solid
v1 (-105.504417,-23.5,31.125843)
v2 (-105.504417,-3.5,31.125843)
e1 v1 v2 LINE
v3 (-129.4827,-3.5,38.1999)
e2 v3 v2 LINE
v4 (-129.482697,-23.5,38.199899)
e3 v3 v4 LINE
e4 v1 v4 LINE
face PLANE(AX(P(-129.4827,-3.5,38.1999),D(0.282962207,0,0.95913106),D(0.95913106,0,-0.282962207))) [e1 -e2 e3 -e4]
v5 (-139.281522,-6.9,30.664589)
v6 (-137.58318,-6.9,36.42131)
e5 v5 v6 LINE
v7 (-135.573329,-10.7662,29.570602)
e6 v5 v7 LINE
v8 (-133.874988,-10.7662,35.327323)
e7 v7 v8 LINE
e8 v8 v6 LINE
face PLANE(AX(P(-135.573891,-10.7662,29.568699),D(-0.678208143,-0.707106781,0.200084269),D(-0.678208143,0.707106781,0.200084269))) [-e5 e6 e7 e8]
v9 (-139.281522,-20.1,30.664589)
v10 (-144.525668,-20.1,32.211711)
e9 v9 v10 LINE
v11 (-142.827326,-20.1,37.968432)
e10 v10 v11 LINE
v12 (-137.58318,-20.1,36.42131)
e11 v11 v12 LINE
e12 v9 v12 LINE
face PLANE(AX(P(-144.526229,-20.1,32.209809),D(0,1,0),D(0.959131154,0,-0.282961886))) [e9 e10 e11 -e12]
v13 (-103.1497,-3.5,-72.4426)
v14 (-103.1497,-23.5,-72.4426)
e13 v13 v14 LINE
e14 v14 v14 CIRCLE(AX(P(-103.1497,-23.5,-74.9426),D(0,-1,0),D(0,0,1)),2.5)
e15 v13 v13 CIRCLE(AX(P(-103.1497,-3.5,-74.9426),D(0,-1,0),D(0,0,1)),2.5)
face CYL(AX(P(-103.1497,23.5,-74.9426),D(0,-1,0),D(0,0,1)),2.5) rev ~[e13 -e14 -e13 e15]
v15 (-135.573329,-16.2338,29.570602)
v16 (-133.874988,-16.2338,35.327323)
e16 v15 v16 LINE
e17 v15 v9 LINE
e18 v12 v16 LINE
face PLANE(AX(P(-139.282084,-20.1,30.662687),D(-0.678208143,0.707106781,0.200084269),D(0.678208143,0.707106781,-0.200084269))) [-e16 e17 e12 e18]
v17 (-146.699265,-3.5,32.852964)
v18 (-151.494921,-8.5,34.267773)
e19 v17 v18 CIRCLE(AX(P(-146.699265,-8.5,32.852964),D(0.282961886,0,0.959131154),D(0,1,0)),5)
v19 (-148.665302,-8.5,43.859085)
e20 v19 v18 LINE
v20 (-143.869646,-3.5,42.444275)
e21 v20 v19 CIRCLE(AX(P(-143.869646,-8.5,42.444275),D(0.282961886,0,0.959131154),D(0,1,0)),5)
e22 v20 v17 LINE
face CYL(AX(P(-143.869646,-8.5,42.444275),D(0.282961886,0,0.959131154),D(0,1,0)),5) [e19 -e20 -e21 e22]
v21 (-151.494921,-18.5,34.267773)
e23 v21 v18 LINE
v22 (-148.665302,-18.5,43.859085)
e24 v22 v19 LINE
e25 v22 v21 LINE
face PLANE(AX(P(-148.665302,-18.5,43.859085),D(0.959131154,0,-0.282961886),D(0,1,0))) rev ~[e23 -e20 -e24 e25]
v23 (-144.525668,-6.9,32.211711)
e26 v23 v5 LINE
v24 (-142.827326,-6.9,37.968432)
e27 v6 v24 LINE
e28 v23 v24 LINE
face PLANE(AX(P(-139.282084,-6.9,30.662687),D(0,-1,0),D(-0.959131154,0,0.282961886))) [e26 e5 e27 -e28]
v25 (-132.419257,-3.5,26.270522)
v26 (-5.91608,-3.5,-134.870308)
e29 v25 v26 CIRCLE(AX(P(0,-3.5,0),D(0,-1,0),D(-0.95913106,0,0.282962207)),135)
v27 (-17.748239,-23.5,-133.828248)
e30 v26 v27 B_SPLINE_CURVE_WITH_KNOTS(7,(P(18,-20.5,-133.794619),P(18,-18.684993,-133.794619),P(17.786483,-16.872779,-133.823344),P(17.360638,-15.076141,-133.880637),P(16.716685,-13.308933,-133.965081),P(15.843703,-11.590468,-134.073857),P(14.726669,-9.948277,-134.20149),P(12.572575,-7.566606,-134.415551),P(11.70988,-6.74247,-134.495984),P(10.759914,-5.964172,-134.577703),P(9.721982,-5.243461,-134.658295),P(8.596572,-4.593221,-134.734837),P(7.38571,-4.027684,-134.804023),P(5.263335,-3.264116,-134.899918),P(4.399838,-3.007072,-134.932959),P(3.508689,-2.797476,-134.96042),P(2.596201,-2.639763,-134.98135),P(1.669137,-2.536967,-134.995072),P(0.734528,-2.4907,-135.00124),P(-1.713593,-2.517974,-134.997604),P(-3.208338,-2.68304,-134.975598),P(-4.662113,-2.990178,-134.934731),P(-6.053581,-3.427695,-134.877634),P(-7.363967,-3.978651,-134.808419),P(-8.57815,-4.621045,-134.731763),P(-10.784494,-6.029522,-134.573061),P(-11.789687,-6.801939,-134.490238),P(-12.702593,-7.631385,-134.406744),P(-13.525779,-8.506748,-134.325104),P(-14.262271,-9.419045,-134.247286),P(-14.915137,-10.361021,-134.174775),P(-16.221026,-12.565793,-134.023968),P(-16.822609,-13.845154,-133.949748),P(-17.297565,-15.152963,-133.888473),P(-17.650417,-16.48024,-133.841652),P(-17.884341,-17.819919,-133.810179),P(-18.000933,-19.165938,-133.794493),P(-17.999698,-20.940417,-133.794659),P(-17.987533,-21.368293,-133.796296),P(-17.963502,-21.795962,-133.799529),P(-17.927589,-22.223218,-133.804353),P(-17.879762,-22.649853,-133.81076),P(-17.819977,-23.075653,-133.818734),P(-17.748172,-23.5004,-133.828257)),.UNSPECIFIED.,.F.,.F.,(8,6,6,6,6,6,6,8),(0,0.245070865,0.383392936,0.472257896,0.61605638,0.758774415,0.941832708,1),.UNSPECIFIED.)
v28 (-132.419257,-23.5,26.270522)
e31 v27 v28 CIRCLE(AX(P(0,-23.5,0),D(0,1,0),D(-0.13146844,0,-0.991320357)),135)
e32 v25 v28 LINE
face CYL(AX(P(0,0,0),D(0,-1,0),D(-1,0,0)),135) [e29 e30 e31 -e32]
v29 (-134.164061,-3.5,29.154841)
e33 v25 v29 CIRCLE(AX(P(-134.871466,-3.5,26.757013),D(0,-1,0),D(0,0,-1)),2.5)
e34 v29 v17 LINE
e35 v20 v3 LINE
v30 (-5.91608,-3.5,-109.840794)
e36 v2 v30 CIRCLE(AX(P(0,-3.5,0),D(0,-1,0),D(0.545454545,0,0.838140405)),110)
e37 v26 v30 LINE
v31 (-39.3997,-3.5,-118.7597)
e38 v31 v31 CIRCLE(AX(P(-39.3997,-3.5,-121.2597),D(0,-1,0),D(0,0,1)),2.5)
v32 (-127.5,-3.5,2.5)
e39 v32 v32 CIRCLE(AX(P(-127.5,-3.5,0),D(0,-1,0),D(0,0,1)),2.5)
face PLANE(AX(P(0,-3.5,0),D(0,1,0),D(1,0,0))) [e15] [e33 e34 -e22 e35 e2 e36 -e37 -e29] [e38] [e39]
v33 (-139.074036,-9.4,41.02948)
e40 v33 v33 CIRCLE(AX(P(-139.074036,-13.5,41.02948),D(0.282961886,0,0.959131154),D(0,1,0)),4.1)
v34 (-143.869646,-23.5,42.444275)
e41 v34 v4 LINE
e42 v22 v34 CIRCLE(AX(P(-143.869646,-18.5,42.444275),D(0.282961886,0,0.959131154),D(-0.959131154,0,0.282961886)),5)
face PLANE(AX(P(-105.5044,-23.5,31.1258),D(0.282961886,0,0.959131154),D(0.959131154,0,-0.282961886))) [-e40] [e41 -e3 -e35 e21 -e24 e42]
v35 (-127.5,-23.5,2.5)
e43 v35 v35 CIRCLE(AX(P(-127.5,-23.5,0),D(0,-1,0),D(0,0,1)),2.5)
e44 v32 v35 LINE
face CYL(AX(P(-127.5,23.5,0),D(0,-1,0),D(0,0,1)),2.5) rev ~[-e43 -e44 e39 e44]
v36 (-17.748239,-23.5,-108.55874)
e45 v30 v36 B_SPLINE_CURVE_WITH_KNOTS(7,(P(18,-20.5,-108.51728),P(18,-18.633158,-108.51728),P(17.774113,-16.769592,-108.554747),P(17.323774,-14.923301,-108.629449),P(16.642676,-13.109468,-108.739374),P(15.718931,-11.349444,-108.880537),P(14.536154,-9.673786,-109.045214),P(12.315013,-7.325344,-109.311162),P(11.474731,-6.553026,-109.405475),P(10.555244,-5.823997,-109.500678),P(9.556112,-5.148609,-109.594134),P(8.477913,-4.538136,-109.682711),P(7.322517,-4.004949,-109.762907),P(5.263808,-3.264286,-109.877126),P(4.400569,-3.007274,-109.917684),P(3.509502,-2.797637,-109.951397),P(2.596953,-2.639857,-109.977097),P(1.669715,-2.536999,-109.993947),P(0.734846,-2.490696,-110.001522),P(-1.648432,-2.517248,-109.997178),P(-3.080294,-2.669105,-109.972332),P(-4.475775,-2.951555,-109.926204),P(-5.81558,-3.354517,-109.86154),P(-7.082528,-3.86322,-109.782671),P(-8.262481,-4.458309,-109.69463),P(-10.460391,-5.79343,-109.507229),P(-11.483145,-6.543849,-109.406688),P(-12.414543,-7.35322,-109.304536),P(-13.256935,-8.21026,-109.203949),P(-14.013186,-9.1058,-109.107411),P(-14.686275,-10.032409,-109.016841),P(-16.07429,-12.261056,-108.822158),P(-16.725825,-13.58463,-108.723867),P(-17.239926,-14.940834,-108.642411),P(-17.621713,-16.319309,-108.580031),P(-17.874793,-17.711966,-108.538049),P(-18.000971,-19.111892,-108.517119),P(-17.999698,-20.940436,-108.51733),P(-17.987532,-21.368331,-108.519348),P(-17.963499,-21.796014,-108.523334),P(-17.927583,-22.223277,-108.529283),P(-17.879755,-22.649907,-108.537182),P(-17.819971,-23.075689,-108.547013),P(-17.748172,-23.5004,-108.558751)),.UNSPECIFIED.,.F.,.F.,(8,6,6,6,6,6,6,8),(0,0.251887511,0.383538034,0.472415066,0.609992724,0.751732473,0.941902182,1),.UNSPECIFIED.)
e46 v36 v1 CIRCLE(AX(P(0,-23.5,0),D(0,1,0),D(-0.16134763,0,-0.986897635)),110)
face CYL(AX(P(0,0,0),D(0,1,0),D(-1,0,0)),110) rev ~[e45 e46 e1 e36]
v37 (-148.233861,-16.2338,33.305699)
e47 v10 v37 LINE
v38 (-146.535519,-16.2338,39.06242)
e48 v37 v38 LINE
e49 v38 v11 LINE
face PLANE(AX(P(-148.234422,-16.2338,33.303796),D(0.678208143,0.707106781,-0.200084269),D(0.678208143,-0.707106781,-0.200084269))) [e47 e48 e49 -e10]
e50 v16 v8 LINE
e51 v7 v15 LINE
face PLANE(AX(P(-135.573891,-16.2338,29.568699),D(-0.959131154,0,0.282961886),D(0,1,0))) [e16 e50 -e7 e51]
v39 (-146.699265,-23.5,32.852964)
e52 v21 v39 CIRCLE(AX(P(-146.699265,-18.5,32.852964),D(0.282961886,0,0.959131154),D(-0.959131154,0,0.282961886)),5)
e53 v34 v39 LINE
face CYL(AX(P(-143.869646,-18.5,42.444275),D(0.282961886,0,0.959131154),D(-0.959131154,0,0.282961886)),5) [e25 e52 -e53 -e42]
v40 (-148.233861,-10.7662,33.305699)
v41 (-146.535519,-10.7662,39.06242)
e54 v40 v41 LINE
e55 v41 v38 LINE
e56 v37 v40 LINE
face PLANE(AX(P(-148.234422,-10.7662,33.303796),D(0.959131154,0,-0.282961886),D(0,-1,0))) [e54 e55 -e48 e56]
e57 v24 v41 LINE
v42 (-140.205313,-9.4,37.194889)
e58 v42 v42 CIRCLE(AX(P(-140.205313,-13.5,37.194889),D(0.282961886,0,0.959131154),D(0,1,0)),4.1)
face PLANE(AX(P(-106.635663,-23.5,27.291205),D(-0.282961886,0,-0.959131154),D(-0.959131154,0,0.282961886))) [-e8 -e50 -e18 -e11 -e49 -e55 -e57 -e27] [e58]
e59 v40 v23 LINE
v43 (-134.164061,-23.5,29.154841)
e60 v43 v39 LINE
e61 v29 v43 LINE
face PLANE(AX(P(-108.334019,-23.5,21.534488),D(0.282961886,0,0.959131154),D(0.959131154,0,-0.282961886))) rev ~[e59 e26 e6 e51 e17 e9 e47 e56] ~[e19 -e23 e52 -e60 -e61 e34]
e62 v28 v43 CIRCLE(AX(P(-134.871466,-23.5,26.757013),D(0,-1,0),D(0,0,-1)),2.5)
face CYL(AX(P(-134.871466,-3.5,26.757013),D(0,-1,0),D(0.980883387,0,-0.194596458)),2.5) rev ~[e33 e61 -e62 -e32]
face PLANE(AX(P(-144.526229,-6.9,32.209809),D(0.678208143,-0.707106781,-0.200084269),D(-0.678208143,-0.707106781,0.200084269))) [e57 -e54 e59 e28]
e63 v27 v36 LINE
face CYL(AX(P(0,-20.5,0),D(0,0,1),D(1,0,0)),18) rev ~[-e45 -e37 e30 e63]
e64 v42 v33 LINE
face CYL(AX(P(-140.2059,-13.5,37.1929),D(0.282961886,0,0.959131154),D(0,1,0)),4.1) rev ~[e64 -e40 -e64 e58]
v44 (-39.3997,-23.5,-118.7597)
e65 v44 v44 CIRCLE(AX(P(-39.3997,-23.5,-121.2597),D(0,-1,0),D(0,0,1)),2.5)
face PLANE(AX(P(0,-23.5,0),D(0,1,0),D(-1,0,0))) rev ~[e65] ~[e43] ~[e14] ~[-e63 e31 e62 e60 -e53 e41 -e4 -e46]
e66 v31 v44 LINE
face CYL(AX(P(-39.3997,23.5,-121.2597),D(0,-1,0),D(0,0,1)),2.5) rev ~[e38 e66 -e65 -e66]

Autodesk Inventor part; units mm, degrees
ref_plane "YZ Plane" through (0, 0, 0) normal (1, 0, 0) x (0, 1, 0)
ref_plane "XZ Plane" through (0, 0, 0) normal (0, 1, 0) x (-1, 0, 0)
ref_plane "XY Plane" through (0, 0, 0) normal (0, 0, 1) x (1, 0, 0)
sketch "Sketch1" plane through (0, 0, 0) normal (0, 1, 0) x (-1, 0, 0)
  circle A0 centre (0, 0) radius 135
  circle A1 centre (0, 0) radius 110
  dimension "d0" = 270
  dimension "d1" = 220
extrude "Extrusion1" add sketch "Sketch1" along normal mid plane 47
sketch "Sketch2" plane through (0, 0, 0) normal (0, 0, 1) x (1, 0, 0)
  circle A0 centre (0, -20.5) radius 18
  line L0 (-135, -23.5) -> (135, -23.5) projected
  dimension "d4" = 36
  dimension "d38" = 3
extrude "Extrusion2" cut sketch "Sketch2" against normal through all
sketch "Sketch3" plane through (0, 23.5, 0) normal (0, 1, 0) x (1, 0, 0)
  circle A0 centre (0, 0) radius 127.5
  circle A1 centre (-127.5, 0) radius 2
  circle A2 centre (-103.1497, -74.9426) radius 2
  circle A3 centre (-39.3997, -121.2597) radius 2
  circle A4 centre (39.3997, -121.2597) radius 2
  circle A5 centre (103.1497, -74.9426) radius 2
  circle A6 centre (127.5, 0) radius 2
  circle A7 centre (103.1497, 74.9426) radius 2
  circle A8 centre (39.3997, 121.2597) radius 2
  circle A9 centre (-39.3997, 121.2597) radius 2
  circle A10 centre (-103.1497, 74.9426) radius 2
  dimension "d7" = 255
  dimension "d8" = 4
  dimension "d11" = 360
hole "Hole1" at (39.3997, 23.5, 121.2597) at (-39.3997, 23.5, 121.2597) at (-103.1497, 23.5, 74.9426) at (-127.5, 23.5, 0) at (-103.1497, 23.5, -74.9426) at (-39.3997, 23.5, -121.2597) at (39.3997, 23.5, -121.2597) at (103.1497, 23.5, -74.9426) at (127.5, 23.5, 0) at (103.1497, 23.5, 74.9426) direction (0, -1, 0) diameter 5 end through all
sketch "Sketch4" plane through (0, 23.5, 0) normal (0, 1, 0) x (1, 0, 0)
  circle A0 centre (0, 0) radius 140
extrude "Extrusion3" cut sketch "Sketch4" against normal blind 27
sketch "Sketch7" plane through (0, -3.5, 0) normal (0, 1, 0) x (1, 0, 0)
  line L0 (0, 0) -> (70, 0)
  line L1 (80, -100) -> (60, -100)
  line L2 (60, -100) -> (60, 100)
  line L3 (60, 100) -> (80, 100)
  line L4 (80, 100) -> (80, -100)
  line L5 (80, -100) -> (60, 100) construction
  line L6 (60, -100) -> (80, 100) construction
  dimension "d39" = 70
  dimension "d40" = 20
  dimension "d41" = 200
extrude "Extrusion7" cut sketch "Sketch7" against normal blind 15
sketch "Sketch8" plane through (0, -3.5, 0) normal (0, 1, 0) x (1, 0, 0)
  line L0 (-129.4827, -38.1999) -> (129.4827, 38.1999)
  line L1 (0, 134.8703) -> (0, -135)
  arc A0 (-5.9161, 134.8703) -> (5.9161, 134.8703) centre (0, 0) ccw projected
  arc A1 (129.4827, 38.1999) -> (0, 135) centre (0, 0) ccw
extrude "Extrusion8" cut sketch "Sketch8" against normal through all
sketch "Sketch9" plane through (0, -3.5, 0) normal (0, 1, 0) x (1, 0, 0)
  line L0 (129.4827, 38.1999) -> (105.5044, 31.1258) projected
  arc A0 (105.5044, 31.1258) -> (17.7482, 108.5587) centre (0, 0) ccw projected
  line L1 (17.7482, 108.5587) -> (17.7482, 133.8282) projected
  arc A1 (129.4827, 38.1999) -> (17.7482, 133.8282) centre (0, 0) ccw projected
  circle A2 centre (39.3997, 121.2597) radius 2.5 projected
  circle A3 centre (103.1497, 74.9426) radius 2.5 projected
  line L2 (105.5044, 31.1258) -> (129.4827, 38.1999) projected
  arc A4 (129.4827, 38.1999) -> (5.9161, 134.8703) centre (0, 0) ccw projected
  line L3 (5.9161, 109.8408) -> (5.9161, 134.8703) projected
  arc A5 (60, 92.1954) -> (5.9161, 109.8408) centre (0, 0) ccw projected
  line L4 (60, 92.1954) -> (60, 100) projected
  line L5 (60, 100) -> (80, 100) projected
  line L6 (80, 100) -> (80, 75.4983) projected
  arc A6 (105.5044, 31.1258) -> (80, 75.4983) centre (0, 0) ccw projected
  circle A7 centre (103.1497, 74.9426) radius 2.5 projected
  circle A8 centre (39.3997, 121.2597) radius 2.5 projected
  point P0 (17.7482, 108.5587)
extrude "Extrusion9" cut sketch "Sketch9" against normal through all
sketch "Sketch10" plane through (-105.5044, -23.5, 31.1258) normal (0.2829619, 0, 0.9591312) x (0.9591312, 0, -0.2829619)
  line L0 (-25, 0) -> (130.8454, 0) projected
  line L1 (-22.5, 0) -> (-40, 0)
  line L2 (-45, 5) -> (-45, 15)
  line L3 (-40, 20) -> (-22.5, 20)
  line L4 (-22.5, 20) -> (-22.5, 0)
  line L5 (-25, 0) -> (-25, 20) projected
  arc A0 (-45, 5) -> (-40, 0) centre (-40, 5) ccw
  arc A1 (-40, 20) -> (-45, 15) centre (-40, 15) ccw
  point P0 (110, 23.5)
  point P1 (-45, 20)
  point P2 (-45, 0)
  point P3 (-25, 0)
  dimension "d48" = 22.5
  dimension "d49" = 20
  dimension "d50" = 20
  dimension "d51" = 5
extrude "Extrusion10" add sketch "Sketch10" against normal blind 10
fillet "Fillet1" radius 2.5 1 edges at (-131.9566, -13.5, 28.5036)
sketch "Sketch11" plane through (-108.334, -23.5, 21.5345) normal (-0.2829619, 0, -0.9591312) x (-0.9591312, 0, 0.2829619)
  line L0 (32.2662, 16.6) -> (37.7338, 16.6)
  line L1 (37.7338, 16.6) -> (41.6, 12.7338)
  line L2 (41.6, 12.7338) -> (41.6, 7.2662)
  line L3 (41.6, 7.2662) -> (37.7338, 3.4)
  line L4 (37.7338, 3.4) -> (32.2662, 3.4)
  line L5 (32.2662, 3.4) -> (28.4, 7.2662)
  line L6 (28.4, 7.2662) -> (28.4, 12.7338)
  line L7 (28.4, 12.7338) -> (32.2662, 16.6)
  line L8 (40, 20) -> (26.9306, 20) projected
  line L9 (45, 5) -> (45, 15) projected
  point P0 (-110, 23.5)
  point P1 (35, 10)
  dimension "d55" = 10
  dimension "d56" = 10
  dimension "d57" = 13.2
extrude "Extrusion11" cut sketch "Sketch11" against normal blind 6
sketch "Sketch12" plane through (-106.6363, -23.5, 27.2893) normal (-0.2829619, 0, -0.9591312) x (-0.9591312, 0, 0.2829619)
  line L0 (45, 5) -> (45, 15) projected
  line L1 (40, 20) -> (26.9306, 20) projected
  point P0 (-110, 23.5)
  point P1 (35, 10)
  dimension "d60" = 10
  dimension "d61" = 10
hole "Hole2" at (-140.2059, -13.5, 37.1929) direction (0.2829619, 0, 0.9591312) diameter 8.2 end through all
properties part number "Cylinder Spacer Bottom_Q"
